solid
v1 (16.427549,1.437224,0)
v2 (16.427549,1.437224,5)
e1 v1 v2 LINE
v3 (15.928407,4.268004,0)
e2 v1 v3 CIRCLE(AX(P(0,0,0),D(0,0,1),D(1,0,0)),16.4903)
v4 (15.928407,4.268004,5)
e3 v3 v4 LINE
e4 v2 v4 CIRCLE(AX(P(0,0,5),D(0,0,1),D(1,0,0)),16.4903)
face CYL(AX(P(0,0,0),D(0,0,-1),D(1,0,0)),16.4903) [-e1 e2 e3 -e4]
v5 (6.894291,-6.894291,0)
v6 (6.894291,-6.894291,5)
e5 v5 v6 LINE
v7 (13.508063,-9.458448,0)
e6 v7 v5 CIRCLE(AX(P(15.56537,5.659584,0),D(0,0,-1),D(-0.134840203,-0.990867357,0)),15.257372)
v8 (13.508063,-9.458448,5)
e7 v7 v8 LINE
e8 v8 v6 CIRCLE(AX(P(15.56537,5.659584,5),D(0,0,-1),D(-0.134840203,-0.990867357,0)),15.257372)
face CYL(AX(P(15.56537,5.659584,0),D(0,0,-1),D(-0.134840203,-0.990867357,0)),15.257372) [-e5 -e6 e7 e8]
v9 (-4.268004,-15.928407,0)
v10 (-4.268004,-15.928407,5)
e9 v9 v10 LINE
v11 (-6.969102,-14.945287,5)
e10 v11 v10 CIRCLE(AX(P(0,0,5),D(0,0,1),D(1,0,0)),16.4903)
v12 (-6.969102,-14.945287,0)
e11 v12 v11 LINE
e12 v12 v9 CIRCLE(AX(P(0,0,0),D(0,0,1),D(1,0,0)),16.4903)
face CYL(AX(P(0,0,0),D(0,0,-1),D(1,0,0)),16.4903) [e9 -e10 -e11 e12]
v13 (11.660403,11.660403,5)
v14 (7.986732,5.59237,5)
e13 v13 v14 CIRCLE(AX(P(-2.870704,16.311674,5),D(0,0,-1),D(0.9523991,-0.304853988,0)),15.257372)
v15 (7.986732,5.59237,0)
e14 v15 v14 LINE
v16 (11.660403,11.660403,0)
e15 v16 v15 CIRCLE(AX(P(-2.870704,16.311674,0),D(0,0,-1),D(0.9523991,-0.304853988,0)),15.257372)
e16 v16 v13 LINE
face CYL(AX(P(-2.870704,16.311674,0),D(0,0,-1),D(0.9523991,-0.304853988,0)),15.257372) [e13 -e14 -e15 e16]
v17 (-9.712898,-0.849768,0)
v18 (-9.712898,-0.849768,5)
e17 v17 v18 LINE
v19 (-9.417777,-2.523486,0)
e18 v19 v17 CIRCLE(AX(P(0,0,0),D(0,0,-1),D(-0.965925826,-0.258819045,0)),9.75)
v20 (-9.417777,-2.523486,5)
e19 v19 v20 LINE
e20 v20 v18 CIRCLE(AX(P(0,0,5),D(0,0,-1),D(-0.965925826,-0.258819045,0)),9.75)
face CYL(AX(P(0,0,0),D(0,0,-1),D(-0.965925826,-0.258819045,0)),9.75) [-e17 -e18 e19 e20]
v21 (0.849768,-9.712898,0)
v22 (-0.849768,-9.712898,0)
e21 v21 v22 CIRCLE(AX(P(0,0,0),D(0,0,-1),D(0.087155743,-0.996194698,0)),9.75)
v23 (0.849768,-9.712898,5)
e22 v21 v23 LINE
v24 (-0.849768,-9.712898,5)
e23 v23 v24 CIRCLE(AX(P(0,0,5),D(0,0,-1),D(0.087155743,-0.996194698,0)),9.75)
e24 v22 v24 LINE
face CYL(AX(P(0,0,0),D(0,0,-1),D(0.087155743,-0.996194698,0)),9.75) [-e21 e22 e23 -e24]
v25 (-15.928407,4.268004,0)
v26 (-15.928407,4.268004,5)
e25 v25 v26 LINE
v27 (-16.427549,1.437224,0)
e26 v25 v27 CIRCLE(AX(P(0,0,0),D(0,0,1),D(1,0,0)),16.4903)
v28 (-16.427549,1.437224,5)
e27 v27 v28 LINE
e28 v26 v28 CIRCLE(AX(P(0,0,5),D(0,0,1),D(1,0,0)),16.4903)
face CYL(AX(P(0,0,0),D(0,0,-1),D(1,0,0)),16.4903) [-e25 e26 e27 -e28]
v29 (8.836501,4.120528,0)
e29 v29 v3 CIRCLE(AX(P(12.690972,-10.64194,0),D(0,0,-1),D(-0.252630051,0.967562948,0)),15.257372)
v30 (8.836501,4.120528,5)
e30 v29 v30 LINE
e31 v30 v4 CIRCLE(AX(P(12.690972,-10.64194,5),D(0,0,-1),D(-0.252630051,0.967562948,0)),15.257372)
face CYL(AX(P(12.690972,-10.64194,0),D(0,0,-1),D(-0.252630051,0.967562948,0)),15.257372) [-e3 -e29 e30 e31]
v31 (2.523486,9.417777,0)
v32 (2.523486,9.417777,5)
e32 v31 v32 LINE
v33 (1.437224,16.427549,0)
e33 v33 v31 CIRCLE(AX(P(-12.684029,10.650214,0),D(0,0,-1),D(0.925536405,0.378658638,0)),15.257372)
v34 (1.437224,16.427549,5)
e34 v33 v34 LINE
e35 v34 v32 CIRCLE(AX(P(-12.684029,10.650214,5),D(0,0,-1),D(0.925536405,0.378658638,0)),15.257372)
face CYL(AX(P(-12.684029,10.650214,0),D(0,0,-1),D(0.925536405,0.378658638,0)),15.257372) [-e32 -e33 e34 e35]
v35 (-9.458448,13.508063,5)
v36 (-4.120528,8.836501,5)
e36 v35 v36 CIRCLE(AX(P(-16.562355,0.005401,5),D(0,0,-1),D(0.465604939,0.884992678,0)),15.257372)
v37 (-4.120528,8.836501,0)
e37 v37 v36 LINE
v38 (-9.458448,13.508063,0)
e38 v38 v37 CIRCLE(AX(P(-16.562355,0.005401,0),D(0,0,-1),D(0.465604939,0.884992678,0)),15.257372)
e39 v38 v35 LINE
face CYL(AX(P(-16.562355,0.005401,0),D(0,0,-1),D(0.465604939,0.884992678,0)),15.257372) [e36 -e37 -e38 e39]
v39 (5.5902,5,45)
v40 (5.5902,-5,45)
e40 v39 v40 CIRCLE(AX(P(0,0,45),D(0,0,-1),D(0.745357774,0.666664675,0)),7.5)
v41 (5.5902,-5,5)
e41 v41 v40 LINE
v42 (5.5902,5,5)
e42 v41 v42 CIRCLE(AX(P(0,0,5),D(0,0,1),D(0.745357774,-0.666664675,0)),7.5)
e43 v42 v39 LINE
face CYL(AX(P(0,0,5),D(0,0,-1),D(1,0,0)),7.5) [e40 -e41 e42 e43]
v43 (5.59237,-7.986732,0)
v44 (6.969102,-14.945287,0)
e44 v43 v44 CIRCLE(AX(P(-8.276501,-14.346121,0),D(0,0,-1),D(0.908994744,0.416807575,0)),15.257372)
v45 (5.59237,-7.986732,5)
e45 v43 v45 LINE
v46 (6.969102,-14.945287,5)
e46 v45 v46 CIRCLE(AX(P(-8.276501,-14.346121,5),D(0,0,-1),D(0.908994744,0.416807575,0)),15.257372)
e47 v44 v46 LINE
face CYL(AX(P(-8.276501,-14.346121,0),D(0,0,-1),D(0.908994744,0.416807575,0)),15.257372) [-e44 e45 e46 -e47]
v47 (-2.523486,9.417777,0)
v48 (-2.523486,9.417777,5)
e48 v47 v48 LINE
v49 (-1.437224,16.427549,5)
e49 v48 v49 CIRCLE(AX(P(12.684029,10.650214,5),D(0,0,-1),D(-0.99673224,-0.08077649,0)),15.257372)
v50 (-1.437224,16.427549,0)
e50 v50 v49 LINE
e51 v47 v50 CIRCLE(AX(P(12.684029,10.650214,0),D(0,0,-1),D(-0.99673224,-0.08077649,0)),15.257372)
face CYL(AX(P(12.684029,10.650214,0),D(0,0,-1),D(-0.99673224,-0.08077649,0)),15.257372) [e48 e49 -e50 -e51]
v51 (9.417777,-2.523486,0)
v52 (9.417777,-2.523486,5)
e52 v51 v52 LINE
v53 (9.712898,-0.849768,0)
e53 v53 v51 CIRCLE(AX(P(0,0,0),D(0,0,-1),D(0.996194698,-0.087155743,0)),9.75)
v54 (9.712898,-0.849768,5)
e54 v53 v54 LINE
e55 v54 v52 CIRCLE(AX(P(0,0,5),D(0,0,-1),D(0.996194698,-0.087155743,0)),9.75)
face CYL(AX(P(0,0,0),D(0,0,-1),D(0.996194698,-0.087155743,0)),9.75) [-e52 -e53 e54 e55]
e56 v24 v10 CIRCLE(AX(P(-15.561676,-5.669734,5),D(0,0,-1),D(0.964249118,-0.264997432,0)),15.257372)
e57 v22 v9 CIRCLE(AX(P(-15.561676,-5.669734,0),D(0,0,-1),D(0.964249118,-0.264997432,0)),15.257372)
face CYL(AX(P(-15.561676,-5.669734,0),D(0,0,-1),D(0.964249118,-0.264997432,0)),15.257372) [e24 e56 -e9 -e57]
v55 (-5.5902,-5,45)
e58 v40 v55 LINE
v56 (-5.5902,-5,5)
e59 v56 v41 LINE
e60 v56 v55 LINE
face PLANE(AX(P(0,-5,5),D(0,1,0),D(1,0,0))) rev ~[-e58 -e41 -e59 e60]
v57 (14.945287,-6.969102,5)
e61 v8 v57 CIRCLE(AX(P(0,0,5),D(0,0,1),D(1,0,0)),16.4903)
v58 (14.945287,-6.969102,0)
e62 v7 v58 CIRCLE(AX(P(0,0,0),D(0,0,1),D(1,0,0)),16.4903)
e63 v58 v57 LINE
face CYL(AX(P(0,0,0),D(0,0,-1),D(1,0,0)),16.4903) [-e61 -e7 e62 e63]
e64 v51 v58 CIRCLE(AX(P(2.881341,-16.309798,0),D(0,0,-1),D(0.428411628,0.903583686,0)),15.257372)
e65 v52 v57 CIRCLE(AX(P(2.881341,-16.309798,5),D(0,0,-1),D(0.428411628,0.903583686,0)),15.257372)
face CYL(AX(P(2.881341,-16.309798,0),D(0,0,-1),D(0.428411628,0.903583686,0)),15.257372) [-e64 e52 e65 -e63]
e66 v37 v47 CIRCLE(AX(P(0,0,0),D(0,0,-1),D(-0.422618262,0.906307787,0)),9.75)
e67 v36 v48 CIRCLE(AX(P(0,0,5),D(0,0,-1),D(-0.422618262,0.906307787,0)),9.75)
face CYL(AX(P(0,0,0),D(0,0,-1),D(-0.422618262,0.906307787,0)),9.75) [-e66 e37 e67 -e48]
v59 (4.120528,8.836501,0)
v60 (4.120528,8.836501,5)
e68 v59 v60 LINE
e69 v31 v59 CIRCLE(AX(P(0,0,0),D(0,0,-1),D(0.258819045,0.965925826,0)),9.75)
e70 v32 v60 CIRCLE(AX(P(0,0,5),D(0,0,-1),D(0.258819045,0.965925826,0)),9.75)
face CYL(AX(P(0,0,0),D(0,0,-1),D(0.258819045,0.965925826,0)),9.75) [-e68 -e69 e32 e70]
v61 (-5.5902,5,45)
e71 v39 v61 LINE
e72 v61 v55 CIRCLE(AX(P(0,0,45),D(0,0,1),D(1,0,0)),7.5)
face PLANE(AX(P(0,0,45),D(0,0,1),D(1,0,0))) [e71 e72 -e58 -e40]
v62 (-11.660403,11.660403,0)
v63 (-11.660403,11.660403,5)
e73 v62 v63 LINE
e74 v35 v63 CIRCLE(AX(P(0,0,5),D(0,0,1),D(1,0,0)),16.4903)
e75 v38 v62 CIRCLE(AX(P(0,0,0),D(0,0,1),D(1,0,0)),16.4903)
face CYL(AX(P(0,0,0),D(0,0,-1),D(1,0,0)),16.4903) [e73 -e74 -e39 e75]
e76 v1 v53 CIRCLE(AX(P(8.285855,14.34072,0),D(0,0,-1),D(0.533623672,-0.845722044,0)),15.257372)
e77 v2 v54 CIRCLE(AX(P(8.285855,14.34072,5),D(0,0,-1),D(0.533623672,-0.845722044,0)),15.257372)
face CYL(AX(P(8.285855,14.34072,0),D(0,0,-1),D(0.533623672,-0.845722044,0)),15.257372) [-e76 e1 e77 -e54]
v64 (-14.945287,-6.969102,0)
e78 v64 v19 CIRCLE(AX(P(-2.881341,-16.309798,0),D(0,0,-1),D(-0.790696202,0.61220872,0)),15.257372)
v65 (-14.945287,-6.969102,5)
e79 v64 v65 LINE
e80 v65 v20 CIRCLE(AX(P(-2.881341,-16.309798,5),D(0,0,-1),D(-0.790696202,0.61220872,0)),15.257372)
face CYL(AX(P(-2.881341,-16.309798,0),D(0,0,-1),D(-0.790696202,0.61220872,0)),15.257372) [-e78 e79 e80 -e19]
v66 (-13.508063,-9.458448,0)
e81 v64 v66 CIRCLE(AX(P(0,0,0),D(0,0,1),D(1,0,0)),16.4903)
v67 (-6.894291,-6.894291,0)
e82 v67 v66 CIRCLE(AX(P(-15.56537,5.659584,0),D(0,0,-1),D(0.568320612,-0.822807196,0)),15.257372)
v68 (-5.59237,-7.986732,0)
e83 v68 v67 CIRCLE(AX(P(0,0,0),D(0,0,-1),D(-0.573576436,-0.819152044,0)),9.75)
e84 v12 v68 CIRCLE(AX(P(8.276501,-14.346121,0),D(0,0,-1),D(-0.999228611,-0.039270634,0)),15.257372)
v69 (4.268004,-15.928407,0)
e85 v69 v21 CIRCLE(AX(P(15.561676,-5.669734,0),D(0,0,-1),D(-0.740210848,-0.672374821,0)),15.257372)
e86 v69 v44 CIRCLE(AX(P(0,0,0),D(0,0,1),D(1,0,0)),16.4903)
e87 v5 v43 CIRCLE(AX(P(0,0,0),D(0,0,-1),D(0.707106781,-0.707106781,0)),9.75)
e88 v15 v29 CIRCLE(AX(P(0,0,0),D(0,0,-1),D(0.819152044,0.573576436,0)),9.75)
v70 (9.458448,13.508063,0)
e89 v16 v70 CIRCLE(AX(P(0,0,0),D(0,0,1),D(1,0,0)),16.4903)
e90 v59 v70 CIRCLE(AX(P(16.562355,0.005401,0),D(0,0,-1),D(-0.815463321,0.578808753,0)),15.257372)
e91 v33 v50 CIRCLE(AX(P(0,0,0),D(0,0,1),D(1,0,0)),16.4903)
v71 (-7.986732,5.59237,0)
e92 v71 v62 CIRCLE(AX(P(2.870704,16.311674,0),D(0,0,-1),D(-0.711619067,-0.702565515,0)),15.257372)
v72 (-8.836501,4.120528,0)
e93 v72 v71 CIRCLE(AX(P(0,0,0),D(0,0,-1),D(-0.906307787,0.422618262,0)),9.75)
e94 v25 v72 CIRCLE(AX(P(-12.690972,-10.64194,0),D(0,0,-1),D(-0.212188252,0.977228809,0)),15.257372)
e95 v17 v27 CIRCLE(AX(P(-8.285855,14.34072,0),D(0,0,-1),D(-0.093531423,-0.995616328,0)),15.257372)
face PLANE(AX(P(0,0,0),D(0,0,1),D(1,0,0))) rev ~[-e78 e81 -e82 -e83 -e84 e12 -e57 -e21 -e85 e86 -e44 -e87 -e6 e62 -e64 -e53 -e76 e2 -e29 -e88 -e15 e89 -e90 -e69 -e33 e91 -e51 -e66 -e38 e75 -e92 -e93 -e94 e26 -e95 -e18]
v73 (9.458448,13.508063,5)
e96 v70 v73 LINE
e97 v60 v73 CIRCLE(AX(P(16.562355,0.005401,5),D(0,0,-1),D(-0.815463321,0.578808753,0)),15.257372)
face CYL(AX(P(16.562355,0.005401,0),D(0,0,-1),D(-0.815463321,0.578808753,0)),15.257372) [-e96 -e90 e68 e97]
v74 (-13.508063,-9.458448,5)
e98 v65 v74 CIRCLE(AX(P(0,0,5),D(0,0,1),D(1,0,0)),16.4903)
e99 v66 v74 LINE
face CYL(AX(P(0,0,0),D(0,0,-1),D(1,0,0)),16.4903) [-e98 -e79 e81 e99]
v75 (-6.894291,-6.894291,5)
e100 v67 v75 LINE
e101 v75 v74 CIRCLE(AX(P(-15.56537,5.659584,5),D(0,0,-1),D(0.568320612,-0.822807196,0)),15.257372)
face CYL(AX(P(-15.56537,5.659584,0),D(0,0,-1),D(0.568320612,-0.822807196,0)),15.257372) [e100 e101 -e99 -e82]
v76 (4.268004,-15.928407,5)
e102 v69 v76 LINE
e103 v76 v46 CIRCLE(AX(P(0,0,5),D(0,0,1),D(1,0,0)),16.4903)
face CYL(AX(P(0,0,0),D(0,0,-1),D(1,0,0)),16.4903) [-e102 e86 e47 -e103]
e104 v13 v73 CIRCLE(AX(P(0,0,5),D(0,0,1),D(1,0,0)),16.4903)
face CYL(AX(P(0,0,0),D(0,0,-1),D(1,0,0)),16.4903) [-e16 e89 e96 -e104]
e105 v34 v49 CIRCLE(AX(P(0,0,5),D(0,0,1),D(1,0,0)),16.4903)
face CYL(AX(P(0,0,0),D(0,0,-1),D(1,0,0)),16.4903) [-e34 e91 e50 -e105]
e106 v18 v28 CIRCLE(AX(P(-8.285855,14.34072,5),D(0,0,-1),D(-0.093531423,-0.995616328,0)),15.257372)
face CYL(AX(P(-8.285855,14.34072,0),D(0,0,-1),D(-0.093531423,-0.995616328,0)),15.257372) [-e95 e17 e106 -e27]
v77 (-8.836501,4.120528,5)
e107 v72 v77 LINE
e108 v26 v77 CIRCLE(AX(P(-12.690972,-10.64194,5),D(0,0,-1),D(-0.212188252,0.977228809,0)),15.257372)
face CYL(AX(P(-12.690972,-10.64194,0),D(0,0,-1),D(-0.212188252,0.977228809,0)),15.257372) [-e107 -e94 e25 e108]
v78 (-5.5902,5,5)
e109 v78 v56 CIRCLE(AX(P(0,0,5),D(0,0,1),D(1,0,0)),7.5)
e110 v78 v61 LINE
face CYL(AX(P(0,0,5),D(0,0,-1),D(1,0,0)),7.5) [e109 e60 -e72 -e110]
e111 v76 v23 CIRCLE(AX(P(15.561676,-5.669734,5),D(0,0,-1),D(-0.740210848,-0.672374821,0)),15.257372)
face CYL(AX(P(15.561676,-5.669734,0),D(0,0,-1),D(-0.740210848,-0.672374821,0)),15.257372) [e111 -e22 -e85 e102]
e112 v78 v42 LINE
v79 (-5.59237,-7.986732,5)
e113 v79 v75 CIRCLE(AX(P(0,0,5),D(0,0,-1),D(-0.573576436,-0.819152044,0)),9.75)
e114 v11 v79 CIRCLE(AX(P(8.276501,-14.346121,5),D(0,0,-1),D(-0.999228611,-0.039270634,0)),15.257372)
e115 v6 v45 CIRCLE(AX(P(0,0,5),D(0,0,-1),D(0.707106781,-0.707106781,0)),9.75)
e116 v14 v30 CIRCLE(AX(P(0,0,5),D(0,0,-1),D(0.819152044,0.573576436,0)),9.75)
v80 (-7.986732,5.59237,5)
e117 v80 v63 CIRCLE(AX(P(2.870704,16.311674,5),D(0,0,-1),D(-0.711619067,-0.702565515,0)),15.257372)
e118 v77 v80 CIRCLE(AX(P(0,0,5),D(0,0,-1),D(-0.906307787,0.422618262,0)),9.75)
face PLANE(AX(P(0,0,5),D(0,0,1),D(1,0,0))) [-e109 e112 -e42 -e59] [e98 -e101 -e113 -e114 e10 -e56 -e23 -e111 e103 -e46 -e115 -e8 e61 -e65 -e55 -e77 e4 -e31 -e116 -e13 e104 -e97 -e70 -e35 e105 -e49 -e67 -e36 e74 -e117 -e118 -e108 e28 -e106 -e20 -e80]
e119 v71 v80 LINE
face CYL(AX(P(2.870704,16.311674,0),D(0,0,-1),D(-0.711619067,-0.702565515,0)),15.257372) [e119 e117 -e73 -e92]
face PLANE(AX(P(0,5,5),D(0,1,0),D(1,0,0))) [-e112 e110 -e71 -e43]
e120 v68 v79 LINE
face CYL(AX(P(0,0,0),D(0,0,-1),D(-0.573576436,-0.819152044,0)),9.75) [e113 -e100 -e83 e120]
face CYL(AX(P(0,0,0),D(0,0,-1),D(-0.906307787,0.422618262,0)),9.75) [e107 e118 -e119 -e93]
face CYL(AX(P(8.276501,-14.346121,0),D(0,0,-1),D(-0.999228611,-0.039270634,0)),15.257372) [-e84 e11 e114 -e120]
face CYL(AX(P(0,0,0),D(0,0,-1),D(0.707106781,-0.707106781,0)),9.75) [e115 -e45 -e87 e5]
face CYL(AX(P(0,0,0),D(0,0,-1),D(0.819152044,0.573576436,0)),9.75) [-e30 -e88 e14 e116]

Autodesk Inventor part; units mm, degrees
sketch "Sketch1" plane through (0, 0, 0) normal (0, 0, 1) x (1, 0, 0)
  circle A0 centre (0, 0) radius 16.4903
  dimension "d0" = 32.9806
extrude "Extrusion1" add sketch "Sketch1" along normal blind 5
ref_plane "Work Plane2" through (0, 0, 2.5) normal (0, 0, 1) x (1, 0, 0)
sketch "Sketch2" plane through (0, 0, 0) normal (0, 0, -1) x (-1, 0, 0)
  circle A0 centre (0, 0) radius 16.4903 projected
  circle A1 centre (0, 0) radius 13.5855
  dimension "d3" = 27.171
surface extrude "Pitch Diameter" sketch "Sketch2" against normal through all shown no curves A1
ref_plane "Work Plane8" through (0, 0, 0) normal (0.9396926, 0.3420201, 0) x (0, 0, 1)
ref_plane "Work Plane9" through (0, 0, 0) normal (1, 0, 0) x (0, 1, 0)
spur gear teeth "Spur Gear" teeth 9 pitch diameter 27 tip diameter 32.9806 root diameter 19.5 face width 5 start plane through (0, 0, 0) normal (0, 0, -1) x (-1, 0, 0)
sketch "Sketch3" plane through (0, 0, 5) normal (0, 0, 1) x (1, 0, 0)
  circle A0 centre (0, 0) radius 7.5
  line L0 (0, 0) -> (0, 5)
  line L1 (0, 5) -> (-5.5902, 5)
  line L2 (0, 5) -> (5.5902, 5)
  line L3 (0, 0) -> (0, -5)
  line L4 (0, -5) -> (5.5902, -5)
  line L5 (0, -5) -> (-5.5902, -5)
  dimension "d49" = 15
  dimension "d50" = 5
  dimension "d51" = 5
extrude "Extrusion2" add sketch "Sketch3" along normal blind 40 contours A0 L4 L3 L0 L2 | L1 L0 L3 L5 A0
equation "\"d0\" = da_da"
equation "\"d1\" = da_b"
equation "\"d3\" = da_dw"
equation "\"d16\" = da_aw"
equation "\"d43\" = da_aw"
equation "\"d46\" = da_aw"
equation "\"da_da\" = 32.980581"
equation "\"da_b\" = 5"
equation "\"da_dw\" = 27.170952"
equation "\"da_aw\" = 164.535212"
properties part number "Spur_Inner_10-1" material "Steel"
